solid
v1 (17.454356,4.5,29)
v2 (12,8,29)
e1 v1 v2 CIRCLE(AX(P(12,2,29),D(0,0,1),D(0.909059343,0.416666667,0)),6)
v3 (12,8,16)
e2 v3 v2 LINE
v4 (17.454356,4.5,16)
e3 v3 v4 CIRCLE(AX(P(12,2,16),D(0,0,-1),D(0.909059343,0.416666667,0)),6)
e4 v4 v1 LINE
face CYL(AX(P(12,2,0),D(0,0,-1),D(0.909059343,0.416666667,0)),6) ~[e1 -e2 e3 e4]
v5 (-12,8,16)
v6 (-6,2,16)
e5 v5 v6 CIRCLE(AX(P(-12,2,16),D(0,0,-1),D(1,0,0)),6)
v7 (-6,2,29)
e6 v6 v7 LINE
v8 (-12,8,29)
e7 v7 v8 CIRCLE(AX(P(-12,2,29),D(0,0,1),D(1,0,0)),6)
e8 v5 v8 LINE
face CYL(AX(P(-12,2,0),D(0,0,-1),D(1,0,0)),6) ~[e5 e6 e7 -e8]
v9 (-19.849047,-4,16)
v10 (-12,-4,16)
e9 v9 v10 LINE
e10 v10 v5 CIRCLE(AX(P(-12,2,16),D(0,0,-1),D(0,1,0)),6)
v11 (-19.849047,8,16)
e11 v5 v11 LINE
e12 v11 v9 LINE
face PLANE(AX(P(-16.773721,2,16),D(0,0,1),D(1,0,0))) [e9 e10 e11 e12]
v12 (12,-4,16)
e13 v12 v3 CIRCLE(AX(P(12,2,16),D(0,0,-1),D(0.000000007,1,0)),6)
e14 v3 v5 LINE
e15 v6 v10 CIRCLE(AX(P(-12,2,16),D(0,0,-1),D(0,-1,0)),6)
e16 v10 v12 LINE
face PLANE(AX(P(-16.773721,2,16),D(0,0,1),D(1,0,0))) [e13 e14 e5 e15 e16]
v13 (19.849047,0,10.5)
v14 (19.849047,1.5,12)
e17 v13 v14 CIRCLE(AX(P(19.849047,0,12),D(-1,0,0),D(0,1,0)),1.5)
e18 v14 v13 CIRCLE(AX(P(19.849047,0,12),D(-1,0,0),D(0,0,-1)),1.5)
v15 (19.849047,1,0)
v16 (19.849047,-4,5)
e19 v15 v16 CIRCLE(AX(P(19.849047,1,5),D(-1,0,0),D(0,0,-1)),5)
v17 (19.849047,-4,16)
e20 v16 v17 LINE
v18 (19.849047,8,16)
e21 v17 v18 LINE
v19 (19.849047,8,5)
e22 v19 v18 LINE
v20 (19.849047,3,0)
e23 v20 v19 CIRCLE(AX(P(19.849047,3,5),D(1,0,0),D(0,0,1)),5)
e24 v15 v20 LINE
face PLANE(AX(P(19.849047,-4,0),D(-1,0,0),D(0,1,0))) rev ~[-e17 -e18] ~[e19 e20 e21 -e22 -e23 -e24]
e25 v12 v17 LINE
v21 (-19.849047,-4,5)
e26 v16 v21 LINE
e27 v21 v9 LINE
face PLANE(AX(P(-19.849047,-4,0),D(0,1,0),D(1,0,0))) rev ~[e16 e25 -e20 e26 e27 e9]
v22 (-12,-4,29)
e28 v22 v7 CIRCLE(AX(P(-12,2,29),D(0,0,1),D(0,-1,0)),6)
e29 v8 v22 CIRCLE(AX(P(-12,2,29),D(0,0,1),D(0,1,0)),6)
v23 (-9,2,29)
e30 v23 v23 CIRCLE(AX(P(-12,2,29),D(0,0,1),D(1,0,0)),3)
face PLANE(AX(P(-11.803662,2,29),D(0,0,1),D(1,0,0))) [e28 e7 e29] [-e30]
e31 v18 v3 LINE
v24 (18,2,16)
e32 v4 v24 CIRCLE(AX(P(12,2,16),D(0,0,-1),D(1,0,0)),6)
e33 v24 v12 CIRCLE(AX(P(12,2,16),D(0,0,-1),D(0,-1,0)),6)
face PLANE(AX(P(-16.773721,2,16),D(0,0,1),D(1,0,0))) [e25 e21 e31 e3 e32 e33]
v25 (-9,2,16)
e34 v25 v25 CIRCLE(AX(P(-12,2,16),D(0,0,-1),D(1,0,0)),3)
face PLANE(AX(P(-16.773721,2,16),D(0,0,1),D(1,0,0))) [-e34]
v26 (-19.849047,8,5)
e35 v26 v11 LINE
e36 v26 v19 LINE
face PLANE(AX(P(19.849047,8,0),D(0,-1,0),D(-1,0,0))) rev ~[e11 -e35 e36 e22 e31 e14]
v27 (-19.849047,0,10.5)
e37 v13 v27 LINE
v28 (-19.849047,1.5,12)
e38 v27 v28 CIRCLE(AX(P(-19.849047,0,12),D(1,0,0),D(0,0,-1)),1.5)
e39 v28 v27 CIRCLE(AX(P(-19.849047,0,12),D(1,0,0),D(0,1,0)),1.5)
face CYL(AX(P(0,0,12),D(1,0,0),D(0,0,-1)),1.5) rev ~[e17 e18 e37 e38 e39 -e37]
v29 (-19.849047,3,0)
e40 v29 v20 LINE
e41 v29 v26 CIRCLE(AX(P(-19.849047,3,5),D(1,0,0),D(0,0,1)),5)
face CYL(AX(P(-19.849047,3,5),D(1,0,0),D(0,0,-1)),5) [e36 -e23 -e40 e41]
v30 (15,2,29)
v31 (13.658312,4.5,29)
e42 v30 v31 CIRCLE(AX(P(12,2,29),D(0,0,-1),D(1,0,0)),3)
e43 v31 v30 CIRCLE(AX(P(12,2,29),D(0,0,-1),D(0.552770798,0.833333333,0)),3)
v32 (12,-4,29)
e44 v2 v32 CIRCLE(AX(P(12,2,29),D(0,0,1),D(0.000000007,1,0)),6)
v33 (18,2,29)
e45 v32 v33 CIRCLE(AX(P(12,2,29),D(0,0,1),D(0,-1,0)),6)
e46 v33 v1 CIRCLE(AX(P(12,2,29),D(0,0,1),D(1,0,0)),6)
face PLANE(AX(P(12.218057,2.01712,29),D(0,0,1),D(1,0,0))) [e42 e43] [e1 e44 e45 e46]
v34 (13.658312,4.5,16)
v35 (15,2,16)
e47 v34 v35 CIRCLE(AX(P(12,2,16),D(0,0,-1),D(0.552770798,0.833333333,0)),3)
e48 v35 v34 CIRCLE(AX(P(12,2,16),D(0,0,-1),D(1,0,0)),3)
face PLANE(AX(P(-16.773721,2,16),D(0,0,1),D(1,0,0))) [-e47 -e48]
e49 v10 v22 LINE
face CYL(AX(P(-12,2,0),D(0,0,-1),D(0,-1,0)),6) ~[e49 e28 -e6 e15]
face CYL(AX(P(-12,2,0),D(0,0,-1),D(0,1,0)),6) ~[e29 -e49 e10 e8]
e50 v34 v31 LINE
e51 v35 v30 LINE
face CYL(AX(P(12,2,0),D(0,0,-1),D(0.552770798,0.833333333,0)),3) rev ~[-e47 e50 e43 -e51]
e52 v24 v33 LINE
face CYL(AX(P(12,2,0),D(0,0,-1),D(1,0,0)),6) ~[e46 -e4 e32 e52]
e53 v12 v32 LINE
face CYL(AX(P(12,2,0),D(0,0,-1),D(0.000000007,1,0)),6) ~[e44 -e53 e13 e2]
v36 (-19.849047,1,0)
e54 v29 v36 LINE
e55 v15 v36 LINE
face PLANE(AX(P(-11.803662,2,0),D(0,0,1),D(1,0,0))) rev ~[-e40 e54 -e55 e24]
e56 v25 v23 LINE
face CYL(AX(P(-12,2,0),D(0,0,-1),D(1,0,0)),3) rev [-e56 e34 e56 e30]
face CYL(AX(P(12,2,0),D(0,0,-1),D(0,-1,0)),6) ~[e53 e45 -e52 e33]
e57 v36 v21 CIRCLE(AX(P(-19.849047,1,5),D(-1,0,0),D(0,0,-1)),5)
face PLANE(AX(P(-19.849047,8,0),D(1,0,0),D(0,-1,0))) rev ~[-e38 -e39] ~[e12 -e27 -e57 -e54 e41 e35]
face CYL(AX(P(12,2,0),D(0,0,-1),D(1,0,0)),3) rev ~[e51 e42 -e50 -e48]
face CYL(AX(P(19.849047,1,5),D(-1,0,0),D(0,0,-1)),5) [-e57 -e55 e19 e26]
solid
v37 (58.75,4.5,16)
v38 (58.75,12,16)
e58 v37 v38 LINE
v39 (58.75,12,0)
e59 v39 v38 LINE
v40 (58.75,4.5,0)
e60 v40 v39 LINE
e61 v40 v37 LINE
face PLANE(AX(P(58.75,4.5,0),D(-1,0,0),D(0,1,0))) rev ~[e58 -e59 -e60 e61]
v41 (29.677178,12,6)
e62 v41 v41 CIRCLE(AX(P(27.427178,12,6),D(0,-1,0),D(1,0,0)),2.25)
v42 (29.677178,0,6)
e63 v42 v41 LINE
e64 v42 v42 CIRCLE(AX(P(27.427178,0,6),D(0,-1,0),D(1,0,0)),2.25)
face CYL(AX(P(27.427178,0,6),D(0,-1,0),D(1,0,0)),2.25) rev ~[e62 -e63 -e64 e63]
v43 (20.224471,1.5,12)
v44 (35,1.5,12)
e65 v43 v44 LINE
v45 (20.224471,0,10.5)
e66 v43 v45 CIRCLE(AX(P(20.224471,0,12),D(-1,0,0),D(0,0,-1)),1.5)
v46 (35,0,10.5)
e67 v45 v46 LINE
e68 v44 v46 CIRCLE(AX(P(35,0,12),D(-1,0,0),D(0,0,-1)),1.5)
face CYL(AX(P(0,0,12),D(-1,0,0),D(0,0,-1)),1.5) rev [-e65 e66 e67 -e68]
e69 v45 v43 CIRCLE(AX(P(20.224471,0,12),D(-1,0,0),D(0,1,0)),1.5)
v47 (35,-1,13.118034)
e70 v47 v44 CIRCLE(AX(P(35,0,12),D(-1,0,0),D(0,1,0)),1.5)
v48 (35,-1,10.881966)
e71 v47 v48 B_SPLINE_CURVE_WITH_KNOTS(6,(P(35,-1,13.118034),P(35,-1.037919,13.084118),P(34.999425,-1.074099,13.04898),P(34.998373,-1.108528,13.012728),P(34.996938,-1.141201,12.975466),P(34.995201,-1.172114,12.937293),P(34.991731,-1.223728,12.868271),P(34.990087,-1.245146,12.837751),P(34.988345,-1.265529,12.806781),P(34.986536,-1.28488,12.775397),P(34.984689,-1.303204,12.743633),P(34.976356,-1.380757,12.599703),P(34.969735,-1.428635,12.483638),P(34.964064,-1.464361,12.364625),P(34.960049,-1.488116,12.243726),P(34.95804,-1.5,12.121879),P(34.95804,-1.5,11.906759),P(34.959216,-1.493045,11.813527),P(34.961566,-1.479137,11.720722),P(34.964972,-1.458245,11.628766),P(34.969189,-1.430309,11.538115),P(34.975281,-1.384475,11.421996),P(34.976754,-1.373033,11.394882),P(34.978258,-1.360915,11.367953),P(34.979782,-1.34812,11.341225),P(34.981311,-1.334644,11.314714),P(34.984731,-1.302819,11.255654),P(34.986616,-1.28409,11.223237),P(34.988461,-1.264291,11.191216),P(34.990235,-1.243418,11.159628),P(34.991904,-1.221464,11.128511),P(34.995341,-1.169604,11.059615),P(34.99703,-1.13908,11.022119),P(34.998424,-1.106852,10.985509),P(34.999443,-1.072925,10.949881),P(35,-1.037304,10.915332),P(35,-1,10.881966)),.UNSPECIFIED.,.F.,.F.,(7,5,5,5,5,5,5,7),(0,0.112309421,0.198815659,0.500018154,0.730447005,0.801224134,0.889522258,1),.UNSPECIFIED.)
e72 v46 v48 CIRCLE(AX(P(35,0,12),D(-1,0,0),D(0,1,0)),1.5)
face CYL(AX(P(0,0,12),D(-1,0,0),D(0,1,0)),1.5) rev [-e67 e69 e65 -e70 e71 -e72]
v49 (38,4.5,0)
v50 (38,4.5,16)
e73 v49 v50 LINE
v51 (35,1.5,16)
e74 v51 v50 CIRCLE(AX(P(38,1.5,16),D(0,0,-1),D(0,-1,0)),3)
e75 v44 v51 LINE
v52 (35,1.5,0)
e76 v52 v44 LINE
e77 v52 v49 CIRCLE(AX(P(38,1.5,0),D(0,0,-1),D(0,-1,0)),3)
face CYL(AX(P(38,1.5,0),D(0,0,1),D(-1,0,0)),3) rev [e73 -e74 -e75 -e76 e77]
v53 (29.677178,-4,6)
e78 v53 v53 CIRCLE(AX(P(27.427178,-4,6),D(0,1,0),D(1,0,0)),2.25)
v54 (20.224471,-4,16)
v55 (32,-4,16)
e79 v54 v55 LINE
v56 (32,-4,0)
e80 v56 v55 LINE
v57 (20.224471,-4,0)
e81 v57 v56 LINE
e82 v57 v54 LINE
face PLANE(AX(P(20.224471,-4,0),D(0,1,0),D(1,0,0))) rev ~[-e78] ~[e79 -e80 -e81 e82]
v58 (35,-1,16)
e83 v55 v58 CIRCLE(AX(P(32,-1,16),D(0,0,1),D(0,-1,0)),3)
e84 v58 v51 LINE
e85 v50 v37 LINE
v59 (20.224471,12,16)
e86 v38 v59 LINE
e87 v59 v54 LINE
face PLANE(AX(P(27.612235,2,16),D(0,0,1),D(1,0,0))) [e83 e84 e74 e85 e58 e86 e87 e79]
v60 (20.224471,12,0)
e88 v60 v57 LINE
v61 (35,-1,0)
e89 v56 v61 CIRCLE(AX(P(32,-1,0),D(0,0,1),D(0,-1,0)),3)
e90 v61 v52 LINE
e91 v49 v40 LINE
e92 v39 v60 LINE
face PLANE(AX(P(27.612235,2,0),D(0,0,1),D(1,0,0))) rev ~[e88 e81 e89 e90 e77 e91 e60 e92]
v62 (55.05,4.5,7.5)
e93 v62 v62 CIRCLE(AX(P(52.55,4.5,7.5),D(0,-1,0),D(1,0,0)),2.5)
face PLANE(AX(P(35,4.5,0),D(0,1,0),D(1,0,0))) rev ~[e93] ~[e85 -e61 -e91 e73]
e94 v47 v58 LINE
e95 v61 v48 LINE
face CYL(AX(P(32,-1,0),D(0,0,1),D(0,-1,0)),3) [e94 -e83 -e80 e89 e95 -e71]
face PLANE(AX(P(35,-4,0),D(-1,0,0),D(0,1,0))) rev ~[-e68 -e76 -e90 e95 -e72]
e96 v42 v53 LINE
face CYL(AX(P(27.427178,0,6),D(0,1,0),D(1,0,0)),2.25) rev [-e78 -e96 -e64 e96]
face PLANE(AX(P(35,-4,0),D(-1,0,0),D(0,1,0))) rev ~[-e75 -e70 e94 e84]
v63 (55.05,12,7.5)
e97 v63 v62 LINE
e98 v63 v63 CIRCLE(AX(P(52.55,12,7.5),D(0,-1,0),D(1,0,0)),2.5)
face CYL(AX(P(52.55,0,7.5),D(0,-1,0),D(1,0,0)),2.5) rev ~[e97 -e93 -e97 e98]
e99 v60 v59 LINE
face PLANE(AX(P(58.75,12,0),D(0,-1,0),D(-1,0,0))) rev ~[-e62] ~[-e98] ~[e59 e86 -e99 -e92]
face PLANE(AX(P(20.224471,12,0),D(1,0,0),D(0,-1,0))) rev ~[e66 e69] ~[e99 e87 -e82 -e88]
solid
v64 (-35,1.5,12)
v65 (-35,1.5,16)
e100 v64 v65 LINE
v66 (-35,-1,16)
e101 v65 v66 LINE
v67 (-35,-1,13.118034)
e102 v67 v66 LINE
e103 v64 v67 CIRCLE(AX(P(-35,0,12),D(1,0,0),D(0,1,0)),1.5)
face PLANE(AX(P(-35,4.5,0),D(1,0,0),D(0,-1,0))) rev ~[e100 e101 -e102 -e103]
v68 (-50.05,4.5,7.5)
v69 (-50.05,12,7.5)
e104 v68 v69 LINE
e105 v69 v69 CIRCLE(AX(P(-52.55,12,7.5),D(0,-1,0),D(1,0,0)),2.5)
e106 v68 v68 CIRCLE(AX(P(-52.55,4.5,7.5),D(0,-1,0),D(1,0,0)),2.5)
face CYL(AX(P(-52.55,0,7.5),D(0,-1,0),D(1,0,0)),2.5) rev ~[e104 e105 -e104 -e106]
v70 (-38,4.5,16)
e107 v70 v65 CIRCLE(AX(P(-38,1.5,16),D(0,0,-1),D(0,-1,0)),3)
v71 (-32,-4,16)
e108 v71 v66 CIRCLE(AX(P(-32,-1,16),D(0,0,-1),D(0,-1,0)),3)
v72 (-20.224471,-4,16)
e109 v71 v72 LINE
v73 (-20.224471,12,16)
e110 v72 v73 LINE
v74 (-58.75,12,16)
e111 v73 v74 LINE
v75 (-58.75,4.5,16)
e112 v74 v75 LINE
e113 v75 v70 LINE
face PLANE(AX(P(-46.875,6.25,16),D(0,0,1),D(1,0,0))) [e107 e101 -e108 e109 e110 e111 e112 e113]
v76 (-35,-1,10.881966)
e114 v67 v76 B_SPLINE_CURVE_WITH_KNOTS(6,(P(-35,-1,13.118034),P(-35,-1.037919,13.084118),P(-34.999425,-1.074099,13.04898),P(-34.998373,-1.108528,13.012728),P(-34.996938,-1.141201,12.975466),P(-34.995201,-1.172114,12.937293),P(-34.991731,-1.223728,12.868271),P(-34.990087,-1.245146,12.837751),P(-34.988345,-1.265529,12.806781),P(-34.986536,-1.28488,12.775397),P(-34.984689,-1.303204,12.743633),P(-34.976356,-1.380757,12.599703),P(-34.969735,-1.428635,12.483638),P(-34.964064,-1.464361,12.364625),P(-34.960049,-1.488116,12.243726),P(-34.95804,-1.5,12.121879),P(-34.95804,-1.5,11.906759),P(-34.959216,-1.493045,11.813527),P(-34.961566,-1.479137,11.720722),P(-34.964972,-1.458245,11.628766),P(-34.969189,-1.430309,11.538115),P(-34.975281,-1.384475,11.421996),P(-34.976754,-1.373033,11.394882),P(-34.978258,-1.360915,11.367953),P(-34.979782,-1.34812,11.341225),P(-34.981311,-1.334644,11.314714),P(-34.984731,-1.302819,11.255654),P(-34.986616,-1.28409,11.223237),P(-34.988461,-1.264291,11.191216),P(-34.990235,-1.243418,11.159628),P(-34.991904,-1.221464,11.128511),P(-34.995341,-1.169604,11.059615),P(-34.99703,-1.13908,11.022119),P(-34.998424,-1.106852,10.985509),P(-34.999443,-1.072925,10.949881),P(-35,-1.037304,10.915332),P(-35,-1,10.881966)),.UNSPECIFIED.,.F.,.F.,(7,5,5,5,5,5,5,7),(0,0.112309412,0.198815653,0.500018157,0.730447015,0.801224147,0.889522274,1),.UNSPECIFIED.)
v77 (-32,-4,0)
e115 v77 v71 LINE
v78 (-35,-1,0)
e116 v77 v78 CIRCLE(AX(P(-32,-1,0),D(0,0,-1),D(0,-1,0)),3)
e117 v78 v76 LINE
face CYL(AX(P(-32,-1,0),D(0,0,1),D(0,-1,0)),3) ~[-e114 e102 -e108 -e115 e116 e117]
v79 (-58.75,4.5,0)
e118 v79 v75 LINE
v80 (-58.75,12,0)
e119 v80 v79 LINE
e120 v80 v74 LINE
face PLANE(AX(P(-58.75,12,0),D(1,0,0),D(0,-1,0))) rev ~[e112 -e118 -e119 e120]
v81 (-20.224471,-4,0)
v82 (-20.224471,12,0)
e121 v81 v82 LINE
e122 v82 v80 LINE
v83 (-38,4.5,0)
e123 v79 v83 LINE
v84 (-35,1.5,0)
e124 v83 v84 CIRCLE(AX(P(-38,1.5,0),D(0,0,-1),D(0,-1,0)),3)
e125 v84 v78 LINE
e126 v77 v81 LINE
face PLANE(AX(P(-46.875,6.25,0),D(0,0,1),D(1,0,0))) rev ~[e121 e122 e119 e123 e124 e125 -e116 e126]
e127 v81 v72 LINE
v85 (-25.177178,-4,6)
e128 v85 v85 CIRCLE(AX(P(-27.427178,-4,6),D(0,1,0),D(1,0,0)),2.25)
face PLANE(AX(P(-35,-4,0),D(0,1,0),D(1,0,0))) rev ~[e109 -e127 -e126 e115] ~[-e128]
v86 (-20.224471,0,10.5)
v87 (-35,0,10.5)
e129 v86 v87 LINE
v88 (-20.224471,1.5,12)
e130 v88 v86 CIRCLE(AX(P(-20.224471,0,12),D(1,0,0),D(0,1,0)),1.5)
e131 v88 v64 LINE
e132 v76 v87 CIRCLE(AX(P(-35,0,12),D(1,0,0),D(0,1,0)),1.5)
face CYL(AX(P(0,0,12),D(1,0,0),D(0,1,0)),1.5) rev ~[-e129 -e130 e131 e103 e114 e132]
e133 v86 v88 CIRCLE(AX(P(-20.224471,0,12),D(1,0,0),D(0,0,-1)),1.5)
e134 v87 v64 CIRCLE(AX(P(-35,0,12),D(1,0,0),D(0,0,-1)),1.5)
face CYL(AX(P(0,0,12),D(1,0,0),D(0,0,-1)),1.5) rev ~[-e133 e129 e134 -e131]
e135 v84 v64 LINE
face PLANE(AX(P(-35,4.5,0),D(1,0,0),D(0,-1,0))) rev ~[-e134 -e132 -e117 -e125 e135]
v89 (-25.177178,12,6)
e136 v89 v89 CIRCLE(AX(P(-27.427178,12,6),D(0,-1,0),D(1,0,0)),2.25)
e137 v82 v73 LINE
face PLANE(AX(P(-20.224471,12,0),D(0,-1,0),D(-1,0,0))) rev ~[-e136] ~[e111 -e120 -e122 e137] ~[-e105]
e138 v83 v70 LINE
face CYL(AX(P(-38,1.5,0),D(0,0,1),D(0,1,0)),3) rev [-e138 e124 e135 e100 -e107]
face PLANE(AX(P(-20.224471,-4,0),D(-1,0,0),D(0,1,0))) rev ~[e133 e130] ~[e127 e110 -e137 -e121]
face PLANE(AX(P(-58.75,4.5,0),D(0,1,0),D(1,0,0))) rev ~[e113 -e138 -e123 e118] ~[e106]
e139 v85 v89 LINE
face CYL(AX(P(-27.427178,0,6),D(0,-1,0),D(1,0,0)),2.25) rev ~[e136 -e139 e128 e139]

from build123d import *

# Parameters (mm, degrees)
F0_W     = 23.75
F0_H     = 3.5
F1_DEPTH = 16
F0_R     = 3
F2_DEPTH = 29
F3_R     = 2.25
F3_R_2   = 2.5
F4_DEPTH = 12.5
F5_R     = 3
F5_2_R   = 3
F7_DEPTH = 40
F8_R     = 5


with BuildPart() as f1:
    # F0 (on Top) → F1 (new body)
    with BuildSketch(Plane.XY):
        with Locations((-46.875, 6.25)):
            Rectangle(F0_W, F0_H)
        Polygon((-20.2244706452, -4), (-20.2244706452, 8), (-35, 8), (-35, 4.5), (-35, -4), align=None)
        Polygon((-35, 8), (-20.2244706452, 8), (-20.2244706452, 12), (-58.75, 12), (-58.75, 8), align=None)
    extrude(amount=F1_DEPTH)


with BuildPart() as f1b:
    # F0 (on Top) → F1, piece 2 (new body)
    with BuildSketch(Plane.XY):
        with BuildLine():
            ThreePointArc((-12, -4), (-18, 2.0000000001), (-11.9999999997, 8))
            Line((-11.9999999997, 8), (-19.8490470648, 8))
            Line((-19.8490470648, 8), (-19.8490470648, -4))
            Line((-19.8490470648, -4), (-12, -4))
        make_face()
        with BuildLine():
            ThreePointArc((-6, 2), (-7.7573593128, 6.242640687), (-11.9999999997, 8))
            ThreePointArc((-11.9999999997, 8), (-18, 2.0000000001), (-12, -4))
            ThreePointArc((-12, -4), (-7.7573593129, -2.2426406871), (-6, 2))
        make_face()
        with Locations((-12, 2)):
            Circle(F0_R, mode=Mode.SUBTRACT)
        with Locations((-12, 2)):
            Circle(F0_R)
        with BuildLine():
            ThreePointArc((12, -4), (6, 2.0000000207), (12.0000000413, 8))
            Line((12.0000000413, 8), (-11.9999999997, 8))
            ThreePointArc((-11.9999999997, 8), (-7.7573593128, 6.242640687), (-6, 2))
            ThreePointArc((-6, 2), (-7.7573593129, -2.2426406871), (-12, -4))
            Line((-12, -4), (12, -4))
        make_face()
        with BuildLine():
            ThreePointArc((18, 2), (17.8620020617, 3.2794263668), (17.4543560573, 4.5))
            ThreePointArc((17.4543560573, 4.5), (15.2403703666, 7.049752458), (12.0000000413, 8))
            ThreePointArc((12.0000000413, 8), (6, 2.0000000207), (12, -4))
            ThreePointArc((12, -4), (16.2426406871, -2.2426406871), (18, 2))
        make_face()
        with BuildLine():
            ThreePointArc((13.6583123952, 4.5), (14.6433820369, 3.4186371655), (15, 2))
            ThreePointArc((15, 2), (9.3566179631, 0.5813628345), (13.6583123952, 4.5))
        make_face(mode=Mode.SUBTRACT)
        with BuildLine():
            ThreePointArc((13.6583123952, 4.5), (9.3566179631, 0.5813628345), (15, 2))
            ThreePointArc((15, 2), (14.6433820369, 3.4186371655), (13.6583123952, 4.5))
        make_face()
        with BuildLine():
            ThreePointArc((12.0000000413, 8), (15.2403703666, 7.049752458), (17.4543560573, 4.5))
            ThreePointArc((17.4543560573, 4.5), (17.8620020617, 3.2794263668), (18, 2))
            ThreePointArc((18, 2), (16.2426406871, -2.2426406871), (12, -4))
            Line((12, -4), (19.8490470648, -4))
            Line((19.8490470648, -4), (19.8490470648, 8))
            Line((19.8490470648, 8), (12.0000000413, 8))
        make_face()
    extrude(amount=F1_DEPTH)

    # F0 (on Top) → F2 (join)
    with BuildSketch(Plane.XY):
        with BuildLine():
            ThreePointArc((-6, 2), (-7.7573593128, 6.242640687), (-11.9999999997, 8))
            ThreePointArc((-11.9999999997, 8), (-18, 2.0000000001), (-12, -4))
            ThreePointArc((-12, -4), (-7.7573593129, -2.2426406871), (-6, 2))
        make_face()
        with Locations((-12, 2)):
            Circle(F0_R, mode=Mode.SUBTRACT)
        with BuildLine():
            ThreePointArc((18, 2), (17.8620020617, 3.2794263668), (17.4543560573, 4.5))
            ThreePointArc((17.4543560573, 4.5), (15.2403703666, 7.049752458), (12.0000000413, 8))
            ThreePointArc((12.0000000413, 8), (6, 2.0000000207), (12, -4))
            ThreePointArc((12, -4), (16.2426406871, -2.2426406871), (18, 2))
        make_face()
        with BuildLine():
            ThreePointArc((13.6583123952, 4.5), (14.6433820369, 3.4186371655), (15, 2))
            ThreePointArc((15, 2), (9.3566179631, 0.5813628345), (13.6583123952, 4.5))
        make_face(mode=Mode.SUBTRACT)
    extrude(amount=F2_DEPTH)


with BuildPart() as f1c:
    # F0 (on Top) → F1, piece 3 (new body)
    with BuildSketch(Plane.XY):
        Polygon((35, 8), (20.2244706452, 8), (20.2244706452, -4), (35, -4), (35, 4.5), align=None)
        with Locations((46.875, 6.25)):
            Rectangle(F0_W, F0_H)
        Polygon((20.2244706452, 12), (20.2244706452, 8), (35, 8), (58.75, 8), (58.75, 12), align=None)
    extrude(amount=F1_DEPTH)


with BuildPart() as f4_tool:
    # F3 (on Front) → F4 (new body, symmetric)
    with BuildSketch(Plane.XZ):
        with Locations((-27.4271778762, 6)):
            Circle(F3_R)
        with Locations((27.4271778762, 6)):
            Circle(F3_R)
        with Locations((-52.55, 7.5)):
            Circle(F3_R_2)
        with Locations((52.55, 7.5)):
            Circle(F3_R_2)
    extrude(amount=F4_DEPTH, both=True)


with BuildPart() as f1_1:
    add(f1.part)

    # F4: cut by f4_tool
    add(f4_tool.part, mode=Mode.SUBTRACT)

    # F5
    f5_edges = [f1_1.edges().sort_by_distance(p)[0] for p in [
        (-35, -4, 8),
        (-35, 4.5, 8),
    ]]
    fillet(f5_edges, radius=F5_R)


with BuildPart() as f1c_1:
    add(f1c.part)

    # F4: cut by f4_tool
    add(f4_tool.part, mode=Mode.SUBTRACT)

    # F5#2
    f5_2_edges = [f1c_1.edges().sort_by_distance(p)[0] for p in [
        (35, 4.5, 8),
        (35, -4, 8),
    ]]
    fillet(f5_2_edges, radius=F5_2_R)


with BuildPart() as f7_tool:
    # F6 (on Right) → F7 (new body, symmetric)
    with BuildSketch(Plane.YZ):
        with BuildLine():
            ThreePointArc((0, 10.5), (1.0606601718, 10.9393398282), (1.5, 12))
            ThreePointArc((1.5, 12), (-1.0606601718, 13.0606601718), (0, 10.5))
        make_face()
    extrude(amount=F7_DEPTH, both=True)


with BuildPart() as f1_2:
    add(f1_1.part)

    # F7: cut by f7_tool
    add(f7_tool.part, mode=Mode.SUBTRACT)


with BuildPart() as f1b_1:
    add(f1b.part)

    # F7: cut by f7_tool
    add(f7_tool.part, mode=Mode.SUBTRACT)

    # F8
    f8_edges = [f1b_1.edges().sort_by_distance(p)[0] for p in [
        (0, -4, 0),
        (0, 8, 0),
    ]]
    fillet(f8_edges, radius=F8_R)


with BuildPart() as f1c_2:
    add(f1c_1.part)

    # F7: cut by f7_tool
    add(f7_tool.part, mode=Mode.SUBTRACT)


solid = Compound([f1_2.part, f1b_1.part, f1c_2.part])
